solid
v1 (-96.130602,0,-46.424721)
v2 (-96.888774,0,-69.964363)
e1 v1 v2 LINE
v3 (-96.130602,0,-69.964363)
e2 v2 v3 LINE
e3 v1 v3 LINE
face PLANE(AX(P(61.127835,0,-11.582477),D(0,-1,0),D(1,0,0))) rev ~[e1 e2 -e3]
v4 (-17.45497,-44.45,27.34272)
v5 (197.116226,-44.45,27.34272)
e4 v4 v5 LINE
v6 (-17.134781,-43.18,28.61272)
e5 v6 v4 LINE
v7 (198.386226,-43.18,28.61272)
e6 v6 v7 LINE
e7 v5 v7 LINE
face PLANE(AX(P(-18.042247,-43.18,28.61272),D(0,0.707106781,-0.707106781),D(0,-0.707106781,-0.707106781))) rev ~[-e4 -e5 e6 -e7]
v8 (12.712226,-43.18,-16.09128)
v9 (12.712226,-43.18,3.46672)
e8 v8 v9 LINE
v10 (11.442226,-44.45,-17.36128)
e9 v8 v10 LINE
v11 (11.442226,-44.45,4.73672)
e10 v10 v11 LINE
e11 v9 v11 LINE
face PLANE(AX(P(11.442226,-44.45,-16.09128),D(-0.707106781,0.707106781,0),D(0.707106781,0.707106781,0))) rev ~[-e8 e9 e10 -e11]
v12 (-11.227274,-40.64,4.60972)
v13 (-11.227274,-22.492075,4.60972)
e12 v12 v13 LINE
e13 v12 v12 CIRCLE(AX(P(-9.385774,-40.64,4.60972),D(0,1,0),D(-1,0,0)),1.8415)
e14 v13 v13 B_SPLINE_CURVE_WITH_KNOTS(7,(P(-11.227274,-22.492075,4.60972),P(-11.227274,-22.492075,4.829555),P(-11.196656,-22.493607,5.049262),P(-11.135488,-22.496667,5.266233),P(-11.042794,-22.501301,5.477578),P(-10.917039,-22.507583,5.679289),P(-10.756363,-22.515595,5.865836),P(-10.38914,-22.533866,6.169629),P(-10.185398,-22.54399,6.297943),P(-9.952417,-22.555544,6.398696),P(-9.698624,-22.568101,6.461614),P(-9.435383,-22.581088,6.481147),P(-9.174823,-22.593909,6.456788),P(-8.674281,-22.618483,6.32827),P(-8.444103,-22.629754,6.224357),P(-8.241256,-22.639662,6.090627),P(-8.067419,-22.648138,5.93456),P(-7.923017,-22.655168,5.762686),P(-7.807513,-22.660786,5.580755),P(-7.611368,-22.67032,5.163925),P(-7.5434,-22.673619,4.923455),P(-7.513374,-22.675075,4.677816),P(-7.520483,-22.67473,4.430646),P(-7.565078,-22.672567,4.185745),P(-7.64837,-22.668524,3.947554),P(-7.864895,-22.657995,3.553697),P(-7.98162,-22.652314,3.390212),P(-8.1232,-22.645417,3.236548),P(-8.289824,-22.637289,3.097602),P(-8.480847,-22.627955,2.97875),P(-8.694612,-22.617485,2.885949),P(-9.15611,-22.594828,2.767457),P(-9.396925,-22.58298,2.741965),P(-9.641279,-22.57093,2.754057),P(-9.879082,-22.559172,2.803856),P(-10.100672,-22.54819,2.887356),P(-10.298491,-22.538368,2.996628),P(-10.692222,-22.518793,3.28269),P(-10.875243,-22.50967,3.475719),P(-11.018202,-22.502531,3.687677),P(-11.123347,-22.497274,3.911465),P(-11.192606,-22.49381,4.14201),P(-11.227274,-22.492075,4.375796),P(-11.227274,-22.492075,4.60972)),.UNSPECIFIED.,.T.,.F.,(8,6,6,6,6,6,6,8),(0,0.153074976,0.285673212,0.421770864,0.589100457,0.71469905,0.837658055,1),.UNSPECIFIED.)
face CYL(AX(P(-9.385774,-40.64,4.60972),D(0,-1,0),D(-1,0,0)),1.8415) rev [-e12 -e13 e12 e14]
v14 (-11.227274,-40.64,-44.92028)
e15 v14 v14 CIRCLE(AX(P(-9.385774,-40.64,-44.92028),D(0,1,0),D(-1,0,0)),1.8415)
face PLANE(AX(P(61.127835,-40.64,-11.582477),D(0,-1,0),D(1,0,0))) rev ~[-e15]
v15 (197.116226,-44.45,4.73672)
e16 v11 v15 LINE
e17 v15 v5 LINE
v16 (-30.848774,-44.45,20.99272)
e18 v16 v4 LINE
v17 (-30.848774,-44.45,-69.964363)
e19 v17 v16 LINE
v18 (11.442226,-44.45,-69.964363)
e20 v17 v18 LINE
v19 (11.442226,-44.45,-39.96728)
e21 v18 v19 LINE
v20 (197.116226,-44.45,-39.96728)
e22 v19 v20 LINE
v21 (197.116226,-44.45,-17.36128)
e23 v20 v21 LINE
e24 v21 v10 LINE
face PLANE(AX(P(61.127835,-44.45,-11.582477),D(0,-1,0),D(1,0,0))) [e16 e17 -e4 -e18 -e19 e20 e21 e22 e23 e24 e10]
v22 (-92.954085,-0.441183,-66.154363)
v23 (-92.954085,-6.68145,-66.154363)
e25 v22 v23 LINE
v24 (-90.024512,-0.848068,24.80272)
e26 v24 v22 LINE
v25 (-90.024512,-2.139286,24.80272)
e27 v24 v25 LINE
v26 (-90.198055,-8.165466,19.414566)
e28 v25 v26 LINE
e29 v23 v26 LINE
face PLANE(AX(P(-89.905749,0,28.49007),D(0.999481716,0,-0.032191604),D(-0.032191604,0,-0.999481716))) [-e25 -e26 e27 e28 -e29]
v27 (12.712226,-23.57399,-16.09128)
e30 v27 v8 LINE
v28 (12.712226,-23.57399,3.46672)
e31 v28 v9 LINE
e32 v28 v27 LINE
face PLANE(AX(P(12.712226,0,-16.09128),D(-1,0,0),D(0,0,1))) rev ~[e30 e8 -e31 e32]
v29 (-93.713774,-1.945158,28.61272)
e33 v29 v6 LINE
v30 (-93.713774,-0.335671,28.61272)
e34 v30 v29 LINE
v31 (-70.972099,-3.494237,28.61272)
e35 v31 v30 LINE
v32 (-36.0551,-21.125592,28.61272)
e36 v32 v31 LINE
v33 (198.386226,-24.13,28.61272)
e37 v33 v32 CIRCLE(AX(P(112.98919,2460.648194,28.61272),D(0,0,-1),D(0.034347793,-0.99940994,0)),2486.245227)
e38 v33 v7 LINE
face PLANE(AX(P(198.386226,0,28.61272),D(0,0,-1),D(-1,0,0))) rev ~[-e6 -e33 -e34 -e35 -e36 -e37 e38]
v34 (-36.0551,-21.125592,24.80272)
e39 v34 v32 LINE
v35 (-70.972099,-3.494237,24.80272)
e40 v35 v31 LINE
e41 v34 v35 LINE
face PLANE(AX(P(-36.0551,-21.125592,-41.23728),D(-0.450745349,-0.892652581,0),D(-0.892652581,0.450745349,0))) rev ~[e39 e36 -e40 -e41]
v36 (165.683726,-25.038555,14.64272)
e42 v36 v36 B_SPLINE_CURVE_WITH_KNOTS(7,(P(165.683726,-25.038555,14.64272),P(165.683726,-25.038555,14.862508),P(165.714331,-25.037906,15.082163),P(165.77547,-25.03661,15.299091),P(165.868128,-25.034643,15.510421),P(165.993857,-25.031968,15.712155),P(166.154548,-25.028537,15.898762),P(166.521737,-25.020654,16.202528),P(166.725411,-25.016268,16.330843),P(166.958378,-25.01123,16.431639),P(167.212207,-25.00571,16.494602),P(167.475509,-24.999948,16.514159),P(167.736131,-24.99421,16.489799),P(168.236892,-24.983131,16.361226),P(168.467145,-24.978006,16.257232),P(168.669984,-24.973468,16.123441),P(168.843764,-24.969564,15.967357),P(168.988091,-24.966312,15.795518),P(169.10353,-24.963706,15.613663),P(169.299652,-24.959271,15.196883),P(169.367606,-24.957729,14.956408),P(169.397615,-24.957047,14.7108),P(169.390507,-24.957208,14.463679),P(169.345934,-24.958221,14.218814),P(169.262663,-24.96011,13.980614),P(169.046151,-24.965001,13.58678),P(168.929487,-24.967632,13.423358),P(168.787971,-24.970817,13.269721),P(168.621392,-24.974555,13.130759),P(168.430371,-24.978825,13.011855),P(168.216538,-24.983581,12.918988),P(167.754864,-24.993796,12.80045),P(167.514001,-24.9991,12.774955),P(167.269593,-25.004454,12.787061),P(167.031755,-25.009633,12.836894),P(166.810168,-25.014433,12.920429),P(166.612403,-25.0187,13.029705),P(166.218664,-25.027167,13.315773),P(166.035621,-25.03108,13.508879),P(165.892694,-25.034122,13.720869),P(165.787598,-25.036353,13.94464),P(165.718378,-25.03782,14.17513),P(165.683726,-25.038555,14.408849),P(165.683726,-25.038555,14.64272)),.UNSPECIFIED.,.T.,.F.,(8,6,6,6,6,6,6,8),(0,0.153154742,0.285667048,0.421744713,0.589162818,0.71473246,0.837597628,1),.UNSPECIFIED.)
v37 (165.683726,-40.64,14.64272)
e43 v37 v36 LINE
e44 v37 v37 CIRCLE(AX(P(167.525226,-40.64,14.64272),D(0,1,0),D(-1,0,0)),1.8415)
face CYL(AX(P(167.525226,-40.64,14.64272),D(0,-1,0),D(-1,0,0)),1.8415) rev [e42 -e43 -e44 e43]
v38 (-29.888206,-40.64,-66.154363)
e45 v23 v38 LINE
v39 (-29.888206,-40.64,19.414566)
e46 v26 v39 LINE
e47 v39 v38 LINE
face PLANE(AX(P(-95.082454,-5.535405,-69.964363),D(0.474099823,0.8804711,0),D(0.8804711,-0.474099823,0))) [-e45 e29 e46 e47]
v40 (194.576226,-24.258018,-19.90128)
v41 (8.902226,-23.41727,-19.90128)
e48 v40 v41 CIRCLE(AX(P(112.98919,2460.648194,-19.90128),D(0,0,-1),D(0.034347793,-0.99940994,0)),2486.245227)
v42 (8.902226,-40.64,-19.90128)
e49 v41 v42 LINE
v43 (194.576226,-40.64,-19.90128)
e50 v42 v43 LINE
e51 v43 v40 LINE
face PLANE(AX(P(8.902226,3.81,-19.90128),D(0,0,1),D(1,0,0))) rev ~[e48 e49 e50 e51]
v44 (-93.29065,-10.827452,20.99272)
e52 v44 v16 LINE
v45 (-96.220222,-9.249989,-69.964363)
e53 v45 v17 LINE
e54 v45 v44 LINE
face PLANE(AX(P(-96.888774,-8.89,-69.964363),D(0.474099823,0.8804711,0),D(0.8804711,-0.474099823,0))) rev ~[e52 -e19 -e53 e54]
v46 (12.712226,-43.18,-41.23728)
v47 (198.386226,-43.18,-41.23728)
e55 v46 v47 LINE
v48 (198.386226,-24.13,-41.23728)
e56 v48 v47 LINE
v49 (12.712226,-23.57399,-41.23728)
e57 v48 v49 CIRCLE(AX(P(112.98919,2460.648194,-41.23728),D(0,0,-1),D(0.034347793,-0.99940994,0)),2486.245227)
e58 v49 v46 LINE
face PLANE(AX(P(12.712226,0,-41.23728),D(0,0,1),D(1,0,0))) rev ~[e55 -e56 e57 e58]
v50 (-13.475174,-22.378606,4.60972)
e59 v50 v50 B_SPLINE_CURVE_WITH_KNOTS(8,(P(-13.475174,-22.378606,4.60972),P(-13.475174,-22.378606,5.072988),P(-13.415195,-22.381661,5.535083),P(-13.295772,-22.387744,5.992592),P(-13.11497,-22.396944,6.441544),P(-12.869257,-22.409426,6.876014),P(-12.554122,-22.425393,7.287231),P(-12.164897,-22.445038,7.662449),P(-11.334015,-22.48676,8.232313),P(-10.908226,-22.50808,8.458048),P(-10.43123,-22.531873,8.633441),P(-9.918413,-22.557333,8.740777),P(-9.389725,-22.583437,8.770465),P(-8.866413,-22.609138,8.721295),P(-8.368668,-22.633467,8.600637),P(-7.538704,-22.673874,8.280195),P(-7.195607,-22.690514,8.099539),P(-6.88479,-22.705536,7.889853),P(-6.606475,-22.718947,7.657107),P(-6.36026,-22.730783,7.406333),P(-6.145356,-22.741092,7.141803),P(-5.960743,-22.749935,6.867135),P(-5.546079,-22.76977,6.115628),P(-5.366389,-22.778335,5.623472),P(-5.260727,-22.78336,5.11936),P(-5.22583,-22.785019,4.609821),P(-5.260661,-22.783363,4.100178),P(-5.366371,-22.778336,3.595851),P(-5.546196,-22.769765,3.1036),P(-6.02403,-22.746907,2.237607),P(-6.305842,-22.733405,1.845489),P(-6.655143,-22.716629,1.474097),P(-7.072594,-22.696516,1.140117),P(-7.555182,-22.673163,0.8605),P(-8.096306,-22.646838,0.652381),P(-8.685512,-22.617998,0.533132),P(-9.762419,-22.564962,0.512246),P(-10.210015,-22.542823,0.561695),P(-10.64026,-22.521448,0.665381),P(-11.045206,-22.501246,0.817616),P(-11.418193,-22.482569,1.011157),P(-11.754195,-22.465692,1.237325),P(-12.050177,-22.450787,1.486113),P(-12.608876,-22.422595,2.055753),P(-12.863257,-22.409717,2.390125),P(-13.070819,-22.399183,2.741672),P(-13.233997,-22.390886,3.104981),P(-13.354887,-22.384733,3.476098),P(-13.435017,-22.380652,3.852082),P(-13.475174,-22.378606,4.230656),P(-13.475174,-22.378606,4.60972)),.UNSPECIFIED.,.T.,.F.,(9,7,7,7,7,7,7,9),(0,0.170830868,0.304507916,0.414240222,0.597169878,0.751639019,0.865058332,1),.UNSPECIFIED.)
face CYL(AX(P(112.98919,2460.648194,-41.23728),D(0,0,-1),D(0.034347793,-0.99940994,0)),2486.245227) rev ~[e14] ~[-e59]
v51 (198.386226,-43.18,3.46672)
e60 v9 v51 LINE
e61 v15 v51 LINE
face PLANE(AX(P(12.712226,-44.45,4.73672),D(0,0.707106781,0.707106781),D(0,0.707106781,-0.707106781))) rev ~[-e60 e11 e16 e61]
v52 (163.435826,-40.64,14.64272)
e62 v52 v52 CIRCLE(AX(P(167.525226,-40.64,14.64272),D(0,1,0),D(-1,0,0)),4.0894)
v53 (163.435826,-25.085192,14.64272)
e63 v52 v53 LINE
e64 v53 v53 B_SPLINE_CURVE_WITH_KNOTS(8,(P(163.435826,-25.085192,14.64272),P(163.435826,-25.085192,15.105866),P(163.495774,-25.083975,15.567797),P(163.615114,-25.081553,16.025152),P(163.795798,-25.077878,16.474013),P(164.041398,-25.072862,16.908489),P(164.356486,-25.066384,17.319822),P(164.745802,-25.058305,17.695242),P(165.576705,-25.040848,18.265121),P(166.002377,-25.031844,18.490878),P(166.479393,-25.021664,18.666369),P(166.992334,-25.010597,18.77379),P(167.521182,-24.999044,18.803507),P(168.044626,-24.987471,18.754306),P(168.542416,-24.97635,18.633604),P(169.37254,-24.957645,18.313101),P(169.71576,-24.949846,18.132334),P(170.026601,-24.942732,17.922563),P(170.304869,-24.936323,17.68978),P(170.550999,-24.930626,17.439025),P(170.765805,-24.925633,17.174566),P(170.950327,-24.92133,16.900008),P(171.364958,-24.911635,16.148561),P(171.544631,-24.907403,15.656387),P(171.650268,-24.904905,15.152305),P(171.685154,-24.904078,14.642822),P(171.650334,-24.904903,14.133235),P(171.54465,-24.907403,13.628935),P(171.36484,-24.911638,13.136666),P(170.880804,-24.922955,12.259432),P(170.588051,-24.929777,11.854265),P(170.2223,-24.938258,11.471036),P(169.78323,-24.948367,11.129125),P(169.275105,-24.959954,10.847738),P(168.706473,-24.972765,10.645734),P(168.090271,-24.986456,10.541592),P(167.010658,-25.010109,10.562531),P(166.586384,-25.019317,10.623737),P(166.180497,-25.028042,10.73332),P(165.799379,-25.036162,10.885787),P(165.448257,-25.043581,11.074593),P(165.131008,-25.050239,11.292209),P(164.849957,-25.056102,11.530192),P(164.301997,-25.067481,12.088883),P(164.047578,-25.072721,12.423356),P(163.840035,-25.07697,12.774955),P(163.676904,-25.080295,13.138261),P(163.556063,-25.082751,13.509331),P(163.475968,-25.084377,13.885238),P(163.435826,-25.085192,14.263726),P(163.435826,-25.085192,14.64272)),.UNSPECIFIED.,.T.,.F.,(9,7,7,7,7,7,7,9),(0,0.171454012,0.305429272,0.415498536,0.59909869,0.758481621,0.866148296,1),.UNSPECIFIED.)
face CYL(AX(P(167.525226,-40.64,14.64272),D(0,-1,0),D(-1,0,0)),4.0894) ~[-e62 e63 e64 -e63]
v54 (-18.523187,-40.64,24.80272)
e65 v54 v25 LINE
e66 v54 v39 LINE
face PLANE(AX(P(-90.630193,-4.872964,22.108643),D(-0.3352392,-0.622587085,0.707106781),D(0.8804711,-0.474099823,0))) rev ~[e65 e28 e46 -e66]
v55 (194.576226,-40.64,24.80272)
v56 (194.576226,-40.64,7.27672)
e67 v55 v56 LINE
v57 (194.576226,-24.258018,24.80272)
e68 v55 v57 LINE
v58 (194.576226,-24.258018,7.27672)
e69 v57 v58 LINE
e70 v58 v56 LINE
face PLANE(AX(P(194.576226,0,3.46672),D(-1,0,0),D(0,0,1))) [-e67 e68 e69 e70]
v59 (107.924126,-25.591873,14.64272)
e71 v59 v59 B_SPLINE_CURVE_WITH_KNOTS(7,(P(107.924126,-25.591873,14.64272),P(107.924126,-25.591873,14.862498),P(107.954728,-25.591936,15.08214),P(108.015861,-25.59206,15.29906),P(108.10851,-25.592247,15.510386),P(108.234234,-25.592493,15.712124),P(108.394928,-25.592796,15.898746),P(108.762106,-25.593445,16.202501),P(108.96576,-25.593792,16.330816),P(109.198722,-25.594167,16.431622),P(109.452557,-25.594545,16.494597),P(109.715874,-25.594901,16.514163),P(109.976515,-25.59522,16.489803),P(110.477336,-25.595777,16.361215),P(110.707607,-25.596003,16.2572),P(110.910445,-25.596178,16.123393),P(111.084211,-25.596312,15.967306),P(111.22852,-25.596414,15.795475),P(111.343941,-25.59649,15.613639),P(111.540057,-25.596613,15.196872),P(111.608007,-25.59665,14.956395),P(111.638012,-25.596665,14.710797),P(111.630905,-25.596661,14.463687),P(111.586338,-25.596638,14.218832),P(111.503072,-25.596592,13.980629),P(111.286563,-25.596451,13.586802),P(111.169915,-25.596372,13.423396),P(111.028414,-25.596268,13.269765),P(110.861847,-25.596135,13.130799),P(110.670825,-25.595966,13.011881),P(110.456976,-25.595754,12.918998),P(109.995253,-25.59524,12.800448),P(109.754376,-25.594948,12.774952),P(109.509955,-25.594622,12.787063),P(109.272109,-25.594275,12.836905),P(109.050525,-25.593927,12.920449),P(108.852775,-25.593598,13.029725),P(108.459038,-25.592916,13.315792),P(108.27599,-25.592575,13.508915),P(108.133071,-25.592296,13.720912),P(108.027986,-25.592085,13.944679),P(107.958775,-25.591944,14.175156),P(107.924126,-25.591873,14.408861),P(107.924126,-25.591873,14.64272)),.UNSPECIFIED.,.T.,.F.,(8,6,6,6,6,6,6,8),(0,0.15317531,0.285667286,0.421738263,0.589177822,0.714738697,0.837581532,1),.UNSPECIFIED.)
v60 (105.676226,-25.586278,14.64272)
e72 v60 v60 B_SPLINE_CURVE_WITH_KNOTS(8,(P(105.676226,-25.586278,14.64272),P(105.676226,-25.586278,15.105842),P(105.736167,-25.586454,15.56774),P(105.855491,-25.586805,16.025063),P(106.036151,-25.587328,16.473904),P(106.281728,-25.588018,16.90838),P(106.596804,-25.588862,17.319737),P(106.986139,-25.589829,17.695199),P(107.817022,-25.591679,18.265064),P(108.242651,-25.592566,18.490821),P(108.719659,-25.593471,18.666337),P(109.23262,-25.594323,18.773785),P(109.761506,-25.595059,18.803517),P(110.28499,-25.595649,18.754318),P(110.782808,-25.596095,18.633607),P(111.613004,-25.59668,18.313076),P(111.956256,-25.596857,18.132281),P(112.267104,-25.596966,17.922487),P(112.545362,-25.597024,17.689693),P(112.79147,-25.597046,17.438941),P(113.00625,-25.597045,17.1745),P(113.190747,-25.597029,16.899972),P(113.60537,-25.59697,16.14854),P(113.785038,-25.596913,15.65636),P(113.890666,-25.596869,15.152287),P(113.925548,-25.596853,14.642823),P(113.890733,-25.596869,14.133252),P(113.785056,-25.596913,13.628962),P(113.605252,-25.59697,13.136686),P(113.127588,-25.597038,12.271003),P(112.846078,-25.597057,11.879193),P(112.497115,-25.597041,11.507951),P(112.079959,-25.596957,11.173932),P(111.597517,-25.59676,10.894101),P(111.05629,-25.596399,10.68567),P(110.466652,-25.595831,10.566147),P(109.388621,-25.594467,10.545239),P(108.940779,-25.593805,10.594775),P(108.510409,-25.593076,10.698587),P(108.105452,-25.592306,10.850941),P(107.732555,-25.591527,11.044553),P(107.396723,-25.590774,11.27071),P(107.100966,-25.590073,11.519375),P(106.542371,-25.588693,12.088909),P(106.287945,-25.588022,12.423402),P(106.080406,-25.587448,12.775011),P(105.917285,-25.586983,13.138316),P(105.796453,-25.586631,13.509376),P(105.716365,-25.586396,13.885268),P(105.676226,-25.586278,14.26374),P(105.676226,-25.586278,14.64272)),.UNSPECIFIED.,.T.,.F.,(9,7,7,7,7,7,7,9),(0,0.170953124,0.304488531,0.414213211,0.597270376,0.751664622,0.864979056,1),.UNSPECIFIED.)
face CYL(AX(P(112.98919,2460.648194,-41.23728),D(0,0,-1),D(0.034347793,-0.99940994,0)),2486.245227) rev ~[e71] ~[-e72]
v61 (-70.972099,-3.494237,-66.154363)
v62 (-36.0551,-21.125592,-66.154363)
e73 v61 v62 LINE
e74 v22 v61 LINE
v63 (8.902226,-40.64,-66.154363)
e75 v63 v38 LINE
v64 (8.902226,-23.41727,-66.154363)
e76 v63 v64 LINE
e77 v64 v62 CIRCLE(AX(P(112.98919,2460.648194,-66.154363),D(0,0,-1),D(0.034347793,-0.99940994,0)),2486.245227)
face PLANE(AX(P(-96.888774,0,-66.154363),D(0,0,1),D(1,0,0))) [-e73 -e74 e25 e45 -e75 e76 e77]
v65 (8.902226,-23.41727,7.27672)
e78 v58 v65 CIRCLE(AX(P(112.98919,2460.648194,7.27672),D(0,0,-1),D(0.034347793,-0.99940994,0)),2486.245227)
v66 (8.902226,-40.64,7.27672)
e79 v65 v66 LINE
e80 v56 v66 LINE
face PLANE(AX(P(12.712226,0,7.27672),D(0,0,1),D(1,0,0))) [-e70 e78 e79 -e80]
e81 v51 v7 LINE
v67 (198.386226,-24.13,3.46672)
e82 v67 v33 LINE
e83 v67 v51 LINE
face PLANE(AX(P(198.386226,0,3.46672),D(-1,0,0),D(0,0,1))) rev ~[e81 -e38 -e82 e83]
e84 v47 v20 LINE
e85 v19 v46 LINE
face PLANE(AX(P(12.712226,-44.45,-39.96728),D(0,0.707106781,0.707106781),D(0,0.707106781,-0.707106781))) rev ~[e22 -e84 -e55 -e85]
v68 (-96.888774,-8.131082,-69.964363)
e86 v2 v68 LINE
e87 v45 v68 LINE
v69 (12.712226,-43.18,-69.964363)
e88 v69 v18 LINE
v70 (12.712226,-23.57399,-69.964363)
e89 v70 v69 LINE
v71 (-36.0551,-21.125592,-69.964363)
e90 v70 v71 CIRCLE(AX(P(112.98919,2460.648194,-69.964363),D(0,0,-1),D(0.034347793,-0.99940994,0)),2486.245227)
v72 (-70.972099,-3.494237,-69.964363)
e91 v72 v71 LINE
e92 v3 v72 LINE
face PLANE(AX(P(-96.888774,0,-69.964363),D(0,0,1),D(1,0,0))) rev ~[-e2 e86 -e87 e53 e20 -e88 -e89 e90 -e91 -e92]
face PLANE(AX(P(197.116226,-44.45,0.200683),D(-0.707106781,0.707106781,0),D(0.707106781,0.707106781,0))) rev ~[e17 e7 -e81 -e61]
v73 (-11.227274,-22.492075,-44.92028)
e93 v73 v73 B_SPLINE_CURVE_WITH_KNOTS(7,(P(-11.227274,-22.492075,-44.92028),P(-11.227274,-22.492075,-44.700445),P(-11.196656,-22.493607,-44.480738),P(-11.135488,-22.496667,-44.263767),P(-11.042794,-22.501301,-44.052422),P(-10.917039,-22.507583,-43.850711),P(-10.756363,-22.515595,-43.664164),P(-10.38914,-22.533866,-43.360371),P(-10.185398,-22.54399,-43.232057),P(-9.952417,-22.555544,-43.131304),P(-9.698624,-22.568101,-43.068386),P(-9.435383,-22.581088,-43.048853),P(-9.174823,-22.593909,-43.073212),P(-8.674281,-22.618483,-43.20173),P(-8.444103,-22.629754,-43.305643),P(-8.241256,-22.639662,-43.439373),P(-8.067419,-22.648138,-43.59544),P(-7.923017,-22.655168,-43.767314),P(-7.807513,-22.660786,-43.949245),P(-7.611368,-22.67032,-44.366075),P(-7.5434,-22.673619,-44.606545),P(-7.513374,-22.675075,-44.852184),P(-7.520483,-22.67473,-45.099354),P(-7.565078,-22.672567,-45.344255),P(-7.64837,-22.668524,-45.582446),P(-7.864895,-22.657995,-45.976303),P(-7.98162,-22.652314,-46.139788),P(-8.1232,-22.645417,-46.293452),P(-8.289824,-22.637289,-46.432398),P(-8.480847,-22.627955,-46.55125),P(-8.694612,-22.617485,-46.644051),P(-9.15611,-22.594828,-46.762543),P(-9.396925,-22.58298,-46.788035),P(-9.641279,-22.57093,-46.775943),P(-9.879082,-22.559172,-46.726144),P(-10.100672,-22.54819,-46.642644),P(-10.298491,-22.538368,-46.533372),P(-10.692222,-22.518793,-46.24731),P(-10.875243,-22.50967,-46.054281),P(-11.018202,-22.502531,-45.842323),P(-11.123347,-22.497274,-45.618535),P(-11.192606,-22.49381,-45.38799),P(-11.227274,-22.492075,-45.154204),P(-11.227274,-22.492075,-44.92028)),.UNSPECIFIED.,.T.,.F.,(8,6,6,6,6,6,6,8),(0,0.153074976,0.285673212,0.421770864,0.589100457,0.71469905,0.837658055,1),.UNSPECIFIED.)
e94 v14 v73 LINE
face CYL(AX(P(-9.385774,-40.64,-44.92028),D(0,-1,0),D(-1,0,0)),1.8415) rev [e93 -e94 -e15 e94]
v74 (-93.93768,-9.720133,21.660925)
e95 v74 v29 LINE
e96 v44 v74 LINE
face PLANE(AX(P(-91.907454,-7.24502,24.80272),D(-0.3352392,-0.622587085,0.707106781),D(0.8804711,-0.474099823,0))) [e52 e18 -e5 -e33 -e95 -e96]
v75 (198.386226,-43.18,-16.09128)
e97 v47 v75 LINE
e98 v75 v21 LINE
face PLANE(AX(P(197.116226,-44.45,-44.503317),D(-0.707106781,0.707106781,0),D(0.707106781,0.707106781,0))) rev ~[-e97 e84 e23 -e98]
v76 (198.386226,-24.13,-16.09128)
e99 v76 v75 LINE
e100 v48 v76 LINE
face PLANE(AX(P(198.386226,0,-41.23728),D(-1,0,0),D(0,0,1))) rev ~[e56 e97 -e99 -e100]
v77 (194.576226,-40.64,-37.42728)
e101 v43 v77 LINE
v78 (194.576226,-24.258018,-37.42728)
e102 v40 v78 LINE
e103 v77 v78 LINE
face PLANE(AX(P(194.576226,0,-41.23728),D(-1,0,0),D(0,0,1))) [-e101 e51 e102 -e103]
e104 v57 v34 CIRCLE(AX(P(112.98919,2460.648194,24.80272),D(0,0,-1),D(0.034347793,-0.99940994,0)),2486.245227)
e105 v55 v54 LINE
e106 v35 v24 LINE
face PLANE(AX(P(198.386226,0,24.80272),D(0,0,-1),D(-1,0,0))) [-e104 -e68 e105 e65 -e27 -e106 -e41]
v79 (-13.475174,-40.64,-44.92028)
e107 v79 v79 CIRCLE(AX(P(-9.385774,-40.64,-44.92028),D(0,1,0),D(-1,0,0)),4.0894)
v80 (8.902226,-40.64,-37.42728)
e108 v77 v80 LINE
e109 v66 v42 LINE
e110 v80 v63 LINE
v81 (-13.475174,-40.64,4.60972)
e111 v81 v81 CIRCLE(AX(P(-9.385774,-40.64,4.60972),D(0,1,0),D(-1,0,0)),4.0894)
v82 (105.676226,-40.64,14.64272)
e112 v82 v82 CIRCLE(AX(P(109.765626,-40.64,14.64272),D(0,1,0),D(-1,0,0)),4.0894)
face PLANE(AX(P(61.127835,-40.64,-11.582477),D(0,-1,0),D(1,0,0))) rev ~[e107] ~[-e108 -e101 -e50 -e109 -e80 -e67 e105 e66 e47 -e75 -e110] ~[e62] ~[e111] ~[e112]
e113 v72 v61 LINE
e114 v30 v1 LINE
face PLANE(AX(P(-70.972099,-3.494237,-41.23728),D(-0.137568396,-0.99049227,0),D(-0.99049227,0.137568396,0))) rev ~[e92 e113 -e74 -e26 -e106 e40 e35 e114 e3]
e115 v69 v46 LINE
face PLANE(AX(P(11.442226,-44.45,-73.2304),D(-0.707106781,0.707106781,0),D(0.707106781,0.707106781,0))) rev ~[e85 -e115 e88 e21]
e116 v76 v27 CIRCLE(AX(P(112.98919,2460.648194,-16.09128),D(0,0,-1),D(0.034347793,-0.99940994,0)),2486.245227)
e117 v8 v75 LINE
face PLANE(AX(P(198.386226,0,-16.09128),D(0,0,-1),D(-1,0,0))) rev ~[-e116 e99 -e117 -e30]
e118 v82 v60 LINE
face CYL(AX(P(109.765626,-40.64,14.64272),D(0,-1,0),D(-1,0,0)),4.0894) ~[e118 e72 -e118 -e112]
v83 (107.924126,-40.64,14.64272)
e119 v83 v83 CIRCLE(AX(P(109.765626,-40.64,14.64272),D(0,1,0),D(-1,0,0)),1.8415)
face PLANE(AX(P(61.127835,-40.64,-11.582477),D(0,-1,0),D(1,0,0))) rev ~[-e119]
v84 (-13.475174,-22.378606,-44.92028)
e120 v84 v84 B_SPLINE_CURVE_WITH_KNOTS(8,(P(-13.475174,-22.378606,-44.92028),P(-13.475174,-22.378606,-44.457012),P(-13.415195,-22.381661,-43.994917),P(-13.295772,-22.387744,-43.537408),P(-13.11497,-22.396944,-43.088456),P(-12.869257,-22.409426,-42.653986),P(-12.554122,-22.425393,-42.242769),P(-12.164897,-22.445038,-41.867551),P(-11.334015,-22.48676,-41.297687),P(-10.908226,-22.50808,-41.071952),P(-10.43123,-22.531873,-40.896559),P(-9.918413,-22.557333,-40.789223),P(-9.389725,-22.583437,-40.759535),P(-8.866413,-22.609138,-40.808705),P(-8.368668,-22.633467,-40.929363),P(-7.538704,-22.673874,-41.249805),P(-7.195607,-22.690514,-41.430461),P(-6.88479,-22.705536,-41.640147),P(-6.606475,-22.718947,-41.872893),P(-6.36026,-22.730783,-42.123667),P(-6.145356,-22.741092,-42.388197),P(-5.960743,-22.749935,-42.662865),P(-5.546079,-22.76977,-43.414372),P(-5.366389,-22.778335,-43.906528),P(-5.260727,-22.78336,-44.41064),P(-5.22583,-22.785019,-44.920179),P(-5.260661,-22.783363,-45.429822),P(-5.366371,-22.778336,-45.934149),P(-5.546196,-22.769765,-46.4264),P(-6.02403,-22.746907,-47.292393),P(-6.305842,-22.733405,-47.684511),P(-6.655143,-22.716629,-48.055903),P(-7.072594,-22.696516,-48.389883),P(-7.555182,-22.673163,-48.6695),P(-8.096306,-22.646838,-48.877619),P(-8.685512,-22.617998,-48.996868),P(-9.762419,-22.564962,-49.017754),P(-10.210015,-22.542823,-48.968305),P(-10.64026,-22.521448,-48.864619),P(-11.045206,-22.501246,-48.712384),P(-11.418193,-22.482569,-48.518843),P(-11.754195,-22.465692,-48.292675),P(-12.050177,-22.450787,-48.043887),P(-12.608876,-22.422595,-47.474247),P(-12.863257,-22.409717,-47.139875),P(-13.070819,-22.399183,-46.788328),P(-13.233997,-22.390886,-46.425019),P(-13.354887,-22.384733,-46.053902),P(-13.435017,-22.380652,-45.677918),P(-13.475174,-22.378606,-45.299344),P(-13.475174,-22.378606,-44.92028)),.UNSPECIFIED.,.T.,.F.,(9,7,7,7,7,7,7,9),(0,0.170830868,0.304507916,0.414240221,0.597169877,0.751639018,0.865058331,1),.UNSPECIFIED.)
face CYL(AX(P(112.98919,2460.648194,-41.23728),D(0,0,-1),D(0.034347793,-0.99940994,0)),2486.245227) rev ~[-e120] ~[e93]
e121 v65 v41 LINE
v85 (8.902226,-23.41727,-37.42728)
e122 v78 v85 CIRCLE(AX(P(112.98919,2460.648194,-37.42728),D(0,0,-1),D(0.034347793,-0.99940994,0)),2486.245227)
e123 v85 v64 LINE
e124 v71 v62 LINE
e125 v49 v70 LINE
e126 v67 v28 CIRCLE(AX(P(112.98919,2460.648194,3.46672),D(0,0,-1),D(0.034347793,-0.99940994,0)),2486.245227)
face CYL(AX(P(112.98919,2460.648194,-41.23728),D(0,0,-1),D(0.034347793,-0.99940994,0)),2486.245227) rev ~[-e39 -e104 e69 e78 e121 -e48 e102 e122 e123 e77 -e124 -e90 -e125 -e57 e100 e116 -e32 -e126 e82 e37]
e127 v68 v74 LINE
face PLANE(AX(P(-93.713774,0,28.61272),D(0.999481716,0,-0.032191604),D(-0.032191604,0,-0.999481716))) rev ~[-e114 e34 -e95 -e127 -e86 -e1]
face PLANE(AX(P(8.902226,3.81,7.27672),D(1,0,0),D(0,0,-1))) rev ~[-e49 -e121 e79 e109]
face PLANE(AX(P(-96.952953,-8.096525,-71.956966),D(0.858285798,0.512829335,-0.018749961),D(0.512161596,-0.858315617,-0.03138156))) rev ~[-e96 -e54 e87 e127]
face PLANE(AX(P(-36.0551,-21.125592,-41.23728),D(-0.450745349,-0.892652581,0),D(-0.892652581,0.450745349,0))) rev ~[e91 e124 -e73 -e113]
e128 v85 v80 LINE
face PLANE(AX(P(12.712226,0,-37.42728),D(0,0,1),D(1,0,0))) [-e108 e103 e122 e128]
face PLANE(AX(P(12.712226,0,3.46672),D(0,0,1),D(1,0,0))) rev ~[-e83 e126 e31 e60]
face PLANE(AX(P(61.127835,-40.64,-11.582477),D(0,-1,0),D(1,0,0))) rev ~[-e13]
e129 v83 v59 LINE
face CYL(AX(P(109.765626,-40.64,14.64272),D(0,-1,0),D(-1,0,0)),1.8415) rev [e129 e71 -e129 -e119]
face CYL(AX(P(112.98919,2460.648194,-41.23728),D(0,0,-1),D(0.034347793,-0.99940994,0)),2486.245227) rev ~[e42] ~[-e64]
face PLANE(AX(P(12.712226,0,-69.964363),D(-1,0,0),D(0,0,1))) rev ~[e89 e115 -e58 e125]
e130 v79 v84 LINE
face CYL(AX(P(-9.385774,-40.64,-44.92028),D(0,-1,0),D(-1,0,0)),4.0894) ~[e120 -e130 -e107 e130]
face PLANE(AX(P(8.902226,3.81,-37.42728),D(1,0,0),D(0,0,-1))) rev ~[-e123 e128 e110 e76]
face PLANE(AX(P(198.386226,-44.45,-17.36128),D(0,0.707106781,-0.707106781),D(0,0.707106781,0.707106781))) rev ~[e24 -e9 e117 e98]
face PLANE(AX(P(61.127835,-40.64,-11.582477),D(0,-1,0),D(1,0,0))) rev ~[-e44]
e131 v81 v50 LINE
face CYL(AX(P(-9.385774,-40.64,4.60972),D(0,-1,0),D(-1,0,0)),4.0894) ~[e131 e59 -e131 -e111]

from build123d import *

# Parameters (mm, degrees)
F1_DEPTH     = 44.45
F4_DEPTH     = 98.5780825813
F5_SIZE      = 7.62
F6_T1_DEPTH  = 219.6945102582
F6_T3_DEPTH  = 31.6780747894
F6_T5_DEPTH  = 188.9400373947
F6_T7_DEPTH  = 31.6780747894
F6_T9_DEPTH  = 31.993119976
F6_T11_DEPTH = 19.558
F6_T13_DEPTH = 95.0320985588
F6_T19_DEPTH = 188.9400373947
F6_T23_DEPTH = 22.8240373947
F6_T30_DEPTH = 22.8240373947
F6_T34_DEPTH = 188.9400373947
F6_T41_DEPTH = 31.993119976
F6_T45_DEPTH = 188.9400373947
F7_T         = 3.81
F7_T3_DEPTH  = 9.8197045255
F7_T5_DEPTH  = 50.8
F7_T7_DEPTH  = 9.8197045256
F7_T9_DEPTH  = 9.8197045255
F8_R         = 4.0894
F8_R_2       = 1.8415
F9_DEPTH     = 40.64
F10_DEPTH    = 127


# Not quite as in the source:
# - a fillet or chamfer that OpenCascade refuses, or shapes differently, is made with other operations: its cross-section is extruded or revolved along the edge and cut away or added
# - a shell that OpenCascade refuses in one call is made with other operations: the cavity is built on its own and cut out


with BuildPart() as f1:
    # F0 (on Front) → F1 (new body)
    with BuildSketch(Plane.XZ):
        Polygon((-27.6737742102, 28.612719938), (-93.7137742102, 28.612719938), (-96.8887742102, -69.9643626433), (-17.5137742102, -69.9643626433), (12.7122257898, -69.9643626433), (12.7122257898, -41.237280062), (198.3862257898, -41.237280062), (198.3862257898, -16.091280062), (12.7122257898, -16.091280062), (12.7122257898, 3.466719938), (198.3862257898, 3.466719938), (198.3862257898, 28.612719938), align=None)
    extrude(amount=F1_DEPTH)

    # F2 (on face) → F4 (cut, through all)
    with BuildSketch(Plane(origin=(0, 0, -69.9643626433), x_dir=(1, 0, 0), z_dir=(0, 0, -1))):
        Polygon((-96.8887742102, 44.45), (-96.8887742102, 8.89), (-30.8487742102, 44.45), align=None)
    extrude(amount=-F4_DEPTH, mode=Mode.SUBTRACT)

    # F5
    f5_edges = [f1.edges().sort_by_distance(p)[0] for p in [
        (-62.281274, -27.524808, 28.61272),
    ]]
    chamfer(f5_edges, length=F5_SIZE)

    # F6: chamfer of 1.27 on 9 edges, made by hand

    # F6_s2 → F6_t1 (cut)
    with BuildSketch(Plane.YZ.offset(-18.0422470736)):
        Polygon((-43.18, 28.612719938), (-44.45, 27.342719938), (-44.45, 28.612719938), align=None)
    extrude(amount=F6_T1_DEPTH, mode=Mode.SUBTRACT)

    # F6_s4 → F6_t3 (cut)
    with BuildSketch(Plane.XY.offset(0.2006825433)):
        Polygon((197.1162257898, -44.45), (198.3862257898, -43.18), (198.3862257898, -44.45), align=None)
    extrude(amount=F6_T3_DEPTH, mode=Mode.SUBTRACT)

    # F6_s6 → F6_t5 (cut)
    with BuildSketch(Plane.YZ.offset(12.7122257898)):
        Polygon((-44.45, 4.736719938), (-43.18, 3.466719938), (-44.45, 3.466719938), align=None)
        Polygon((-44.45, -17.361280062), (-43.18, -16.091280062), (-44.45, -16.091280062), align=None)
        Polygon((-44.45, -39.967280062), (-43.18, -41.237280062), (-44.45, -41.237280062), align=None)
    extrude(amount=F6_T5_DEPTH, mode=Mode.SUBTRACT)

    # F6_s8 → F6_t7 (cut)
    with BuildSketch(Plane.XY.offset(-44.5033174567)):
        Polygon((197.1162257898, -44.45), (198.3862257898, -43.18), (198.3862257898, -44.45), align=None)
    extrude(amount=F6_T7_DEPTH, mode=Mode.SUBTRACT)

    # F6_s10 → F6_t9 (cut)
    with BuildSketch(Plane.XY.offset(-73.230400038)):
        Polygon((11.4422257898, -44.45), (12.7122257898, -43.18), (12.7122257898, -44.45), align=None)
    extrude(amount=F6_T9_DEPTH, mode=Mode.SUBTRACT)

    # F6_s12 → F6_t11 (cut)
    with BuildSketch(Plane.XY.offset(-16.091280062)):
        Polygon((11.4422257898, -44.45), (12.7122257898, -43.18), (12.7122257898, -44.45), align=None)
    extrude(amount=F6_T11_DEPTH, mode=Mode.SUBTRACT)

    # F6_s14 → F6_t13 (cut)
    with BuildSketch(Plane(origin=(-2.4104397516, 1.297929097, -74.8390924249), x_dir=(0.474099823, 0.8804710999, 0), z_dir=(0.0321867693, -0.0173313373, 0.9993315949))):
        Polygon((-53.0941334984, 78.8407390233), (-53.7623387855, 77.722372749), (-53.7623387855, 78.4811766705), align=None)
    extrude(amount=F6_T13_DEPTH, mode=Mode.SUBTRACT)


with BuildPart() as f6_tool17:
    # F6_s18 → F6_t19 (new body)
    with BuildSketch(Plane.YZ.offset(9.4461883951)):
        Polygon((-44.45, 4.736719938), (-43.18, 3.466719938), (-44.45, 3.466719938), align=None)
    extrude(amount=F6_T19_DEPTH)

    split(bisect_by=Plane.YZ.offset(12.7122257898), keep=Keep.BOTTOM)


with BuildPart() as f6_tool21:
    # F6_s22 → F6_t23 (new body)
    with BuildSketch(Plane.XY.offset(-16.091280062)):
        Polygon((11.4422257898, -44.45), (12.7122257898, -43.18), (12.7122257898, -44.45), align=None)
    extrude(amount=F6_T23_DEPTH)

    split(bisect_by=Plane.XY.offset(3.466719938), keep=Keep.TOP)


with BuildPart() as f6_tool17_1:
    add(f6_tool17.part)

    # F6_t25: intersect F6_tool21
    add(f6_tool21.part, mode=Mode.INTERSECT)


with BuildPart() as f1_1:
    add(f1.part)

    # F6_t15: cut F6_tool17
    add(f6_tool17_1.part, mode=Mode.SUBTRACT)


with BuildPart() as f6_tool28:
    # F6_s29 → F6_t30 (new body)
    with BuildSketch(Plane.XY.offset(-19.3573174567)):
        Polygon((11.4422257898, -44.45), (12.7122257898, -43.18), (12.7122257898, -44.45), align=None)
    extrude(amount=F6_T30_DEPTH)

    split(bisect_by=Plane.XY.offset(-16.091280062), keep=Keep.BOTTOM)


with BuildPart() as f6_tool32:
    # F6_s33 → F6_t34 (new body)
    with BuildSketch(Plane.YZ.offset(198.3862257898)):
        Polygon((-44.45, -17.361280062), (-43.18, -16.091280062), (-44.45, -16.091280062), align=None)
    extrude(amount=-F6_T34_DEPTH)

    split(bisect_by=Plane.YZ.offset(12.7122257898), keep=Keep.BOTTOM)


with BuildPart() as f6_tool28_1:
    add(f6_tool28.part)

    # F6_t36: intersect F6_tool32
    add(f6_tool32.part, mode=Mode.INTERSECT)


with BuildPart() as f1_2:
    add(f1_1.part)

    # F6_t26: cut F6_tool28
    add(f6_tool28_1.part, mode=Mode.SUBTRACT)


with BuildPart() as f6_tool39:
    # F6_s40 → F6_t41 (new body)
    with BuildSketch(Plane.XY.offset(-69.9643626433)):
        Polygon((11.4422257898, -44.45), (12.7122257898, -43.18), (12.7122257898, -44.45), align=None)
    extrude(amount=F6_T41_DEPTH)

    split(bisect_by=Plane.XY.offset(-41.237280062), keep=Keep.TOP)


with BuildPart() as f6_tool43:
    # F6_s44 → F6_t45 (new body)
    with BuildSketch(Plane.YZ.offset(9.4461883951)):
        Polygon((-44.45, -39.967280062), (-43.18, -41.237280062), (-44.45, -41.237280062), align=None)
    extrude(amount=F6_T45_DEPTH)

    split(bisect_by=Plane.YZ.offset(12.7122257898), keep=Keep.BOTTOM)


with BuildPart() as f6_tool39_1:
    add(f6_tool39.part)

    # F6_t47: intersect F6_tool43
    add(f6_tool43.part, mode=Mode.INTERSECT)


with BuildPart() as f1_3:
    add(f1_2.part)

    # F6_t37: cut F6_tool39
    add(f6_tool39_1.part, mode=Mode.SUBTRACT)

    # F7: shell of thickness 3.81, made by hand


with BuildPart() as f7_core1:
    # F7_t2: copy of F1
    add(f1_3.part)

    # the walls: a layer under each face that stays
    f7_faces = [f7_core1.faces().sort_by_distance(p)[0] for p in [
        (52.3362257898, -21.59, 28.612719938),
        (-95.3012742102, -4.8600664948, -20.6758213526),
        (-95.0796094442, -9.4847066882, -24.1721603779),
        (-63.5344983168, -26.8499947118, -24.4858213526),
        (83.1337257898, -44.45, -21.3108213526),
        (197.7512257898, -43.815, 16.039719938),
        (104.9142257898, -43.815, 4.101719938),
        (105.5492257898, -21.59, 3.466719938),
        (12.7122257898, -21.59, -6.312280062),
        (105.5492257898, -21.59, -16.091280062),
        (198.3862257898, -21.59, -28.664280062),
        (105.5492257898, -21.59, -41.237280062),
        (12.7122257898, -21.59, -55.6008213526),
        (12.0772257898, -43.815, -6.312280062),
        (104.9142257898, -43.815, -16.726280062),
        (197.7512257898, -43.815, -28.664280062),
        (104.9142257898, -43.815, -40.602280062),
        (12.0772257898, -43.815, -54.9658213526),
        (-42.0882742102, -22.225, -69.9643626433),
        (198.3862257898, -21.59, 16.039719938),
        (90.4656276778, -43.815, 27.977719938),
        (-57.0896392603, -25.9930745223, 24.802719938),
    ]]
    thicken(f7_faces, amount=-F7_T, mode=Mode.SUBTRACT)

    # F7_s4 → F7_t3 (cut)
    with BuildSketch(Plane(origin=(-9.1117935238, -9.1117935238, 9.1117935238), x_dir=(0.7071067812, -0.7071067812, 0), z_dir=(-0.5773502692, -0.5773502692, 0.5773502692))):
        Polygon((39.5789218716, -9.640847327), (37.6167718716, -6.3082949707), (35.7117718716, -7.4081472335), (35.7117718716, -9.6078517591), align=None)
    extrude(amount=F7_T3_DEPTH, mode=Mode.SUBTRACT)

    # F7_s6 → F7_t5 (cut)
    with BuildSketch(Plane.XZ.offset(-3.81)):
        Polygon((12.7503257898, 3.428619938), (12.7122257898, 7.276719938), (8.9022257898, 7.276719938), (8.9022257898, 3.466719938), align=None)
        Polygon((12.7503257898, -16.053180062), (8.9022257898, -16.091280062), (8.9022257898, -19.901280062), (12.7122257898, -19.901280062), align=None)
        Polygon((12.7503257898, -41.275380062), (12.7122257898, -37.427280062), (8.9022257898, -37.427280062), (8.9022257898, -41.237280062), align=None)
    extrude(amount=F7_T5_DEPTH, mode=Mode.SUBTRACT)

    # F7_s8 → F7_t7 (cut)
    with BuildSketch(Plane(origin=(-13.3199802318, -13.3199802318, -13.3199802318), x_dir=(0.7071067812, -0.7071067812, 0), z_dir=(-0.5773502692, -0.5773502692, -0.5773502692))):
        Polygon((39.5789218716, -0.6670628499), (35.7117718716, -0.7000584178), (35.7117718716, -2.8997629434), (37.6167718716, -3.9996152062), align=None)
    extrude(amount=F7_T7_DEPTH, mode=Mode.SUBTRACT)

    # F7_s10 → F7_t9 (cut)
    with BuildSketch(Plane(origin=(0.1201307583, 0.1201307583, -0.1201307583), x_dir=(-0.7071067812, 0.7071067812, 0), z_dir=(0.5773502692, 0.5773502692, -0.5773502692))):
        Polygon((-39.5789218716, -46.1415104808), (-37.6167718716, -42.8089581245), (-35.7117718716, -43.9088103873), (-35.7117718716, -46.1085149129), align=None)
    extrude(amount=F7_T9_DEPTH, mode=Mode.SUBTRACT)


with BuildPart() as f1_4:
    add(f1_3.part)

    # what is left inside the walls is the cavity
    f7_cavity = [f7_core1.part.solids().sort_by_distance(p)[0] for p in [
        (50.81107, -0.0381, -35.835335),
    ]]
    add(f7_cavity, mode=Mode.SUBTRACT)

    # F8 (on face) → F9 (join, through all)
    with BuildSketch(Plane(origin=(0, -40.64, 0), x_dir=(-1, 0, 0), z_dir=(0, 1, 0))):
        with Locations((-167.5252257898, 14.642719938)):
            Circle(F8_R)
        with Locations((-167.5252257898, 14.642719938)):
            Circle(F8_R_2, mode=Mode.SUBTRACT)
        with Locations((-109.7656257898, 14.642719938)):
            Circle(F8_R)
        with Locations((-109.7656257898, 14.642719938)):
            Circle(F8_R_2, mode=Mode.SUBTRACT)
        with Locations((9.3857742102, -44.920280062)):
            Circle(F8_R)
        with Locations((9.3857742102, -44.920280062)):
            Circle(F8_R_2, mode=Mode.SUBTRACT)
        with Locations((9.3857742102, 4.609719938)):
            Circle(F8_R)
        with Locations((9.3857742102, 4.609719938)):
            Circle(F8_R_2, mode=Mode.SUBTRACT)
    extrude(amount=F9_DEPTH)

    # F3 (on face) → F10 (cut, symmetric)
    with BuildSketch(Plane(origin=(0, 0, -41.237280062), x_dir=(1, 0, 0), z_dir=(0, 0, -1))):
        with BuildLine():
            Line((-70.9720987785, 3.4942372568), (-96.1306024302, 0))
            Line((-96.1306024302, 0), (198.3862257898, 0))
            Line((198.3862257898, 0), (198.3862257898, 24.13))
            ThreePointArc((198.3862257898, 24.13), (81.1301273633, 25.39290124), (-36.0551004282, 21.1255923438))
            Line((-36.0551004282, 21.1255923438), (-70.9720987785, 3.4942372568))
        make_face()
    extrude(amount=F10_DEPTH, both=True, mode=Mode.SUBTRACT)


solid = f1_4.part
